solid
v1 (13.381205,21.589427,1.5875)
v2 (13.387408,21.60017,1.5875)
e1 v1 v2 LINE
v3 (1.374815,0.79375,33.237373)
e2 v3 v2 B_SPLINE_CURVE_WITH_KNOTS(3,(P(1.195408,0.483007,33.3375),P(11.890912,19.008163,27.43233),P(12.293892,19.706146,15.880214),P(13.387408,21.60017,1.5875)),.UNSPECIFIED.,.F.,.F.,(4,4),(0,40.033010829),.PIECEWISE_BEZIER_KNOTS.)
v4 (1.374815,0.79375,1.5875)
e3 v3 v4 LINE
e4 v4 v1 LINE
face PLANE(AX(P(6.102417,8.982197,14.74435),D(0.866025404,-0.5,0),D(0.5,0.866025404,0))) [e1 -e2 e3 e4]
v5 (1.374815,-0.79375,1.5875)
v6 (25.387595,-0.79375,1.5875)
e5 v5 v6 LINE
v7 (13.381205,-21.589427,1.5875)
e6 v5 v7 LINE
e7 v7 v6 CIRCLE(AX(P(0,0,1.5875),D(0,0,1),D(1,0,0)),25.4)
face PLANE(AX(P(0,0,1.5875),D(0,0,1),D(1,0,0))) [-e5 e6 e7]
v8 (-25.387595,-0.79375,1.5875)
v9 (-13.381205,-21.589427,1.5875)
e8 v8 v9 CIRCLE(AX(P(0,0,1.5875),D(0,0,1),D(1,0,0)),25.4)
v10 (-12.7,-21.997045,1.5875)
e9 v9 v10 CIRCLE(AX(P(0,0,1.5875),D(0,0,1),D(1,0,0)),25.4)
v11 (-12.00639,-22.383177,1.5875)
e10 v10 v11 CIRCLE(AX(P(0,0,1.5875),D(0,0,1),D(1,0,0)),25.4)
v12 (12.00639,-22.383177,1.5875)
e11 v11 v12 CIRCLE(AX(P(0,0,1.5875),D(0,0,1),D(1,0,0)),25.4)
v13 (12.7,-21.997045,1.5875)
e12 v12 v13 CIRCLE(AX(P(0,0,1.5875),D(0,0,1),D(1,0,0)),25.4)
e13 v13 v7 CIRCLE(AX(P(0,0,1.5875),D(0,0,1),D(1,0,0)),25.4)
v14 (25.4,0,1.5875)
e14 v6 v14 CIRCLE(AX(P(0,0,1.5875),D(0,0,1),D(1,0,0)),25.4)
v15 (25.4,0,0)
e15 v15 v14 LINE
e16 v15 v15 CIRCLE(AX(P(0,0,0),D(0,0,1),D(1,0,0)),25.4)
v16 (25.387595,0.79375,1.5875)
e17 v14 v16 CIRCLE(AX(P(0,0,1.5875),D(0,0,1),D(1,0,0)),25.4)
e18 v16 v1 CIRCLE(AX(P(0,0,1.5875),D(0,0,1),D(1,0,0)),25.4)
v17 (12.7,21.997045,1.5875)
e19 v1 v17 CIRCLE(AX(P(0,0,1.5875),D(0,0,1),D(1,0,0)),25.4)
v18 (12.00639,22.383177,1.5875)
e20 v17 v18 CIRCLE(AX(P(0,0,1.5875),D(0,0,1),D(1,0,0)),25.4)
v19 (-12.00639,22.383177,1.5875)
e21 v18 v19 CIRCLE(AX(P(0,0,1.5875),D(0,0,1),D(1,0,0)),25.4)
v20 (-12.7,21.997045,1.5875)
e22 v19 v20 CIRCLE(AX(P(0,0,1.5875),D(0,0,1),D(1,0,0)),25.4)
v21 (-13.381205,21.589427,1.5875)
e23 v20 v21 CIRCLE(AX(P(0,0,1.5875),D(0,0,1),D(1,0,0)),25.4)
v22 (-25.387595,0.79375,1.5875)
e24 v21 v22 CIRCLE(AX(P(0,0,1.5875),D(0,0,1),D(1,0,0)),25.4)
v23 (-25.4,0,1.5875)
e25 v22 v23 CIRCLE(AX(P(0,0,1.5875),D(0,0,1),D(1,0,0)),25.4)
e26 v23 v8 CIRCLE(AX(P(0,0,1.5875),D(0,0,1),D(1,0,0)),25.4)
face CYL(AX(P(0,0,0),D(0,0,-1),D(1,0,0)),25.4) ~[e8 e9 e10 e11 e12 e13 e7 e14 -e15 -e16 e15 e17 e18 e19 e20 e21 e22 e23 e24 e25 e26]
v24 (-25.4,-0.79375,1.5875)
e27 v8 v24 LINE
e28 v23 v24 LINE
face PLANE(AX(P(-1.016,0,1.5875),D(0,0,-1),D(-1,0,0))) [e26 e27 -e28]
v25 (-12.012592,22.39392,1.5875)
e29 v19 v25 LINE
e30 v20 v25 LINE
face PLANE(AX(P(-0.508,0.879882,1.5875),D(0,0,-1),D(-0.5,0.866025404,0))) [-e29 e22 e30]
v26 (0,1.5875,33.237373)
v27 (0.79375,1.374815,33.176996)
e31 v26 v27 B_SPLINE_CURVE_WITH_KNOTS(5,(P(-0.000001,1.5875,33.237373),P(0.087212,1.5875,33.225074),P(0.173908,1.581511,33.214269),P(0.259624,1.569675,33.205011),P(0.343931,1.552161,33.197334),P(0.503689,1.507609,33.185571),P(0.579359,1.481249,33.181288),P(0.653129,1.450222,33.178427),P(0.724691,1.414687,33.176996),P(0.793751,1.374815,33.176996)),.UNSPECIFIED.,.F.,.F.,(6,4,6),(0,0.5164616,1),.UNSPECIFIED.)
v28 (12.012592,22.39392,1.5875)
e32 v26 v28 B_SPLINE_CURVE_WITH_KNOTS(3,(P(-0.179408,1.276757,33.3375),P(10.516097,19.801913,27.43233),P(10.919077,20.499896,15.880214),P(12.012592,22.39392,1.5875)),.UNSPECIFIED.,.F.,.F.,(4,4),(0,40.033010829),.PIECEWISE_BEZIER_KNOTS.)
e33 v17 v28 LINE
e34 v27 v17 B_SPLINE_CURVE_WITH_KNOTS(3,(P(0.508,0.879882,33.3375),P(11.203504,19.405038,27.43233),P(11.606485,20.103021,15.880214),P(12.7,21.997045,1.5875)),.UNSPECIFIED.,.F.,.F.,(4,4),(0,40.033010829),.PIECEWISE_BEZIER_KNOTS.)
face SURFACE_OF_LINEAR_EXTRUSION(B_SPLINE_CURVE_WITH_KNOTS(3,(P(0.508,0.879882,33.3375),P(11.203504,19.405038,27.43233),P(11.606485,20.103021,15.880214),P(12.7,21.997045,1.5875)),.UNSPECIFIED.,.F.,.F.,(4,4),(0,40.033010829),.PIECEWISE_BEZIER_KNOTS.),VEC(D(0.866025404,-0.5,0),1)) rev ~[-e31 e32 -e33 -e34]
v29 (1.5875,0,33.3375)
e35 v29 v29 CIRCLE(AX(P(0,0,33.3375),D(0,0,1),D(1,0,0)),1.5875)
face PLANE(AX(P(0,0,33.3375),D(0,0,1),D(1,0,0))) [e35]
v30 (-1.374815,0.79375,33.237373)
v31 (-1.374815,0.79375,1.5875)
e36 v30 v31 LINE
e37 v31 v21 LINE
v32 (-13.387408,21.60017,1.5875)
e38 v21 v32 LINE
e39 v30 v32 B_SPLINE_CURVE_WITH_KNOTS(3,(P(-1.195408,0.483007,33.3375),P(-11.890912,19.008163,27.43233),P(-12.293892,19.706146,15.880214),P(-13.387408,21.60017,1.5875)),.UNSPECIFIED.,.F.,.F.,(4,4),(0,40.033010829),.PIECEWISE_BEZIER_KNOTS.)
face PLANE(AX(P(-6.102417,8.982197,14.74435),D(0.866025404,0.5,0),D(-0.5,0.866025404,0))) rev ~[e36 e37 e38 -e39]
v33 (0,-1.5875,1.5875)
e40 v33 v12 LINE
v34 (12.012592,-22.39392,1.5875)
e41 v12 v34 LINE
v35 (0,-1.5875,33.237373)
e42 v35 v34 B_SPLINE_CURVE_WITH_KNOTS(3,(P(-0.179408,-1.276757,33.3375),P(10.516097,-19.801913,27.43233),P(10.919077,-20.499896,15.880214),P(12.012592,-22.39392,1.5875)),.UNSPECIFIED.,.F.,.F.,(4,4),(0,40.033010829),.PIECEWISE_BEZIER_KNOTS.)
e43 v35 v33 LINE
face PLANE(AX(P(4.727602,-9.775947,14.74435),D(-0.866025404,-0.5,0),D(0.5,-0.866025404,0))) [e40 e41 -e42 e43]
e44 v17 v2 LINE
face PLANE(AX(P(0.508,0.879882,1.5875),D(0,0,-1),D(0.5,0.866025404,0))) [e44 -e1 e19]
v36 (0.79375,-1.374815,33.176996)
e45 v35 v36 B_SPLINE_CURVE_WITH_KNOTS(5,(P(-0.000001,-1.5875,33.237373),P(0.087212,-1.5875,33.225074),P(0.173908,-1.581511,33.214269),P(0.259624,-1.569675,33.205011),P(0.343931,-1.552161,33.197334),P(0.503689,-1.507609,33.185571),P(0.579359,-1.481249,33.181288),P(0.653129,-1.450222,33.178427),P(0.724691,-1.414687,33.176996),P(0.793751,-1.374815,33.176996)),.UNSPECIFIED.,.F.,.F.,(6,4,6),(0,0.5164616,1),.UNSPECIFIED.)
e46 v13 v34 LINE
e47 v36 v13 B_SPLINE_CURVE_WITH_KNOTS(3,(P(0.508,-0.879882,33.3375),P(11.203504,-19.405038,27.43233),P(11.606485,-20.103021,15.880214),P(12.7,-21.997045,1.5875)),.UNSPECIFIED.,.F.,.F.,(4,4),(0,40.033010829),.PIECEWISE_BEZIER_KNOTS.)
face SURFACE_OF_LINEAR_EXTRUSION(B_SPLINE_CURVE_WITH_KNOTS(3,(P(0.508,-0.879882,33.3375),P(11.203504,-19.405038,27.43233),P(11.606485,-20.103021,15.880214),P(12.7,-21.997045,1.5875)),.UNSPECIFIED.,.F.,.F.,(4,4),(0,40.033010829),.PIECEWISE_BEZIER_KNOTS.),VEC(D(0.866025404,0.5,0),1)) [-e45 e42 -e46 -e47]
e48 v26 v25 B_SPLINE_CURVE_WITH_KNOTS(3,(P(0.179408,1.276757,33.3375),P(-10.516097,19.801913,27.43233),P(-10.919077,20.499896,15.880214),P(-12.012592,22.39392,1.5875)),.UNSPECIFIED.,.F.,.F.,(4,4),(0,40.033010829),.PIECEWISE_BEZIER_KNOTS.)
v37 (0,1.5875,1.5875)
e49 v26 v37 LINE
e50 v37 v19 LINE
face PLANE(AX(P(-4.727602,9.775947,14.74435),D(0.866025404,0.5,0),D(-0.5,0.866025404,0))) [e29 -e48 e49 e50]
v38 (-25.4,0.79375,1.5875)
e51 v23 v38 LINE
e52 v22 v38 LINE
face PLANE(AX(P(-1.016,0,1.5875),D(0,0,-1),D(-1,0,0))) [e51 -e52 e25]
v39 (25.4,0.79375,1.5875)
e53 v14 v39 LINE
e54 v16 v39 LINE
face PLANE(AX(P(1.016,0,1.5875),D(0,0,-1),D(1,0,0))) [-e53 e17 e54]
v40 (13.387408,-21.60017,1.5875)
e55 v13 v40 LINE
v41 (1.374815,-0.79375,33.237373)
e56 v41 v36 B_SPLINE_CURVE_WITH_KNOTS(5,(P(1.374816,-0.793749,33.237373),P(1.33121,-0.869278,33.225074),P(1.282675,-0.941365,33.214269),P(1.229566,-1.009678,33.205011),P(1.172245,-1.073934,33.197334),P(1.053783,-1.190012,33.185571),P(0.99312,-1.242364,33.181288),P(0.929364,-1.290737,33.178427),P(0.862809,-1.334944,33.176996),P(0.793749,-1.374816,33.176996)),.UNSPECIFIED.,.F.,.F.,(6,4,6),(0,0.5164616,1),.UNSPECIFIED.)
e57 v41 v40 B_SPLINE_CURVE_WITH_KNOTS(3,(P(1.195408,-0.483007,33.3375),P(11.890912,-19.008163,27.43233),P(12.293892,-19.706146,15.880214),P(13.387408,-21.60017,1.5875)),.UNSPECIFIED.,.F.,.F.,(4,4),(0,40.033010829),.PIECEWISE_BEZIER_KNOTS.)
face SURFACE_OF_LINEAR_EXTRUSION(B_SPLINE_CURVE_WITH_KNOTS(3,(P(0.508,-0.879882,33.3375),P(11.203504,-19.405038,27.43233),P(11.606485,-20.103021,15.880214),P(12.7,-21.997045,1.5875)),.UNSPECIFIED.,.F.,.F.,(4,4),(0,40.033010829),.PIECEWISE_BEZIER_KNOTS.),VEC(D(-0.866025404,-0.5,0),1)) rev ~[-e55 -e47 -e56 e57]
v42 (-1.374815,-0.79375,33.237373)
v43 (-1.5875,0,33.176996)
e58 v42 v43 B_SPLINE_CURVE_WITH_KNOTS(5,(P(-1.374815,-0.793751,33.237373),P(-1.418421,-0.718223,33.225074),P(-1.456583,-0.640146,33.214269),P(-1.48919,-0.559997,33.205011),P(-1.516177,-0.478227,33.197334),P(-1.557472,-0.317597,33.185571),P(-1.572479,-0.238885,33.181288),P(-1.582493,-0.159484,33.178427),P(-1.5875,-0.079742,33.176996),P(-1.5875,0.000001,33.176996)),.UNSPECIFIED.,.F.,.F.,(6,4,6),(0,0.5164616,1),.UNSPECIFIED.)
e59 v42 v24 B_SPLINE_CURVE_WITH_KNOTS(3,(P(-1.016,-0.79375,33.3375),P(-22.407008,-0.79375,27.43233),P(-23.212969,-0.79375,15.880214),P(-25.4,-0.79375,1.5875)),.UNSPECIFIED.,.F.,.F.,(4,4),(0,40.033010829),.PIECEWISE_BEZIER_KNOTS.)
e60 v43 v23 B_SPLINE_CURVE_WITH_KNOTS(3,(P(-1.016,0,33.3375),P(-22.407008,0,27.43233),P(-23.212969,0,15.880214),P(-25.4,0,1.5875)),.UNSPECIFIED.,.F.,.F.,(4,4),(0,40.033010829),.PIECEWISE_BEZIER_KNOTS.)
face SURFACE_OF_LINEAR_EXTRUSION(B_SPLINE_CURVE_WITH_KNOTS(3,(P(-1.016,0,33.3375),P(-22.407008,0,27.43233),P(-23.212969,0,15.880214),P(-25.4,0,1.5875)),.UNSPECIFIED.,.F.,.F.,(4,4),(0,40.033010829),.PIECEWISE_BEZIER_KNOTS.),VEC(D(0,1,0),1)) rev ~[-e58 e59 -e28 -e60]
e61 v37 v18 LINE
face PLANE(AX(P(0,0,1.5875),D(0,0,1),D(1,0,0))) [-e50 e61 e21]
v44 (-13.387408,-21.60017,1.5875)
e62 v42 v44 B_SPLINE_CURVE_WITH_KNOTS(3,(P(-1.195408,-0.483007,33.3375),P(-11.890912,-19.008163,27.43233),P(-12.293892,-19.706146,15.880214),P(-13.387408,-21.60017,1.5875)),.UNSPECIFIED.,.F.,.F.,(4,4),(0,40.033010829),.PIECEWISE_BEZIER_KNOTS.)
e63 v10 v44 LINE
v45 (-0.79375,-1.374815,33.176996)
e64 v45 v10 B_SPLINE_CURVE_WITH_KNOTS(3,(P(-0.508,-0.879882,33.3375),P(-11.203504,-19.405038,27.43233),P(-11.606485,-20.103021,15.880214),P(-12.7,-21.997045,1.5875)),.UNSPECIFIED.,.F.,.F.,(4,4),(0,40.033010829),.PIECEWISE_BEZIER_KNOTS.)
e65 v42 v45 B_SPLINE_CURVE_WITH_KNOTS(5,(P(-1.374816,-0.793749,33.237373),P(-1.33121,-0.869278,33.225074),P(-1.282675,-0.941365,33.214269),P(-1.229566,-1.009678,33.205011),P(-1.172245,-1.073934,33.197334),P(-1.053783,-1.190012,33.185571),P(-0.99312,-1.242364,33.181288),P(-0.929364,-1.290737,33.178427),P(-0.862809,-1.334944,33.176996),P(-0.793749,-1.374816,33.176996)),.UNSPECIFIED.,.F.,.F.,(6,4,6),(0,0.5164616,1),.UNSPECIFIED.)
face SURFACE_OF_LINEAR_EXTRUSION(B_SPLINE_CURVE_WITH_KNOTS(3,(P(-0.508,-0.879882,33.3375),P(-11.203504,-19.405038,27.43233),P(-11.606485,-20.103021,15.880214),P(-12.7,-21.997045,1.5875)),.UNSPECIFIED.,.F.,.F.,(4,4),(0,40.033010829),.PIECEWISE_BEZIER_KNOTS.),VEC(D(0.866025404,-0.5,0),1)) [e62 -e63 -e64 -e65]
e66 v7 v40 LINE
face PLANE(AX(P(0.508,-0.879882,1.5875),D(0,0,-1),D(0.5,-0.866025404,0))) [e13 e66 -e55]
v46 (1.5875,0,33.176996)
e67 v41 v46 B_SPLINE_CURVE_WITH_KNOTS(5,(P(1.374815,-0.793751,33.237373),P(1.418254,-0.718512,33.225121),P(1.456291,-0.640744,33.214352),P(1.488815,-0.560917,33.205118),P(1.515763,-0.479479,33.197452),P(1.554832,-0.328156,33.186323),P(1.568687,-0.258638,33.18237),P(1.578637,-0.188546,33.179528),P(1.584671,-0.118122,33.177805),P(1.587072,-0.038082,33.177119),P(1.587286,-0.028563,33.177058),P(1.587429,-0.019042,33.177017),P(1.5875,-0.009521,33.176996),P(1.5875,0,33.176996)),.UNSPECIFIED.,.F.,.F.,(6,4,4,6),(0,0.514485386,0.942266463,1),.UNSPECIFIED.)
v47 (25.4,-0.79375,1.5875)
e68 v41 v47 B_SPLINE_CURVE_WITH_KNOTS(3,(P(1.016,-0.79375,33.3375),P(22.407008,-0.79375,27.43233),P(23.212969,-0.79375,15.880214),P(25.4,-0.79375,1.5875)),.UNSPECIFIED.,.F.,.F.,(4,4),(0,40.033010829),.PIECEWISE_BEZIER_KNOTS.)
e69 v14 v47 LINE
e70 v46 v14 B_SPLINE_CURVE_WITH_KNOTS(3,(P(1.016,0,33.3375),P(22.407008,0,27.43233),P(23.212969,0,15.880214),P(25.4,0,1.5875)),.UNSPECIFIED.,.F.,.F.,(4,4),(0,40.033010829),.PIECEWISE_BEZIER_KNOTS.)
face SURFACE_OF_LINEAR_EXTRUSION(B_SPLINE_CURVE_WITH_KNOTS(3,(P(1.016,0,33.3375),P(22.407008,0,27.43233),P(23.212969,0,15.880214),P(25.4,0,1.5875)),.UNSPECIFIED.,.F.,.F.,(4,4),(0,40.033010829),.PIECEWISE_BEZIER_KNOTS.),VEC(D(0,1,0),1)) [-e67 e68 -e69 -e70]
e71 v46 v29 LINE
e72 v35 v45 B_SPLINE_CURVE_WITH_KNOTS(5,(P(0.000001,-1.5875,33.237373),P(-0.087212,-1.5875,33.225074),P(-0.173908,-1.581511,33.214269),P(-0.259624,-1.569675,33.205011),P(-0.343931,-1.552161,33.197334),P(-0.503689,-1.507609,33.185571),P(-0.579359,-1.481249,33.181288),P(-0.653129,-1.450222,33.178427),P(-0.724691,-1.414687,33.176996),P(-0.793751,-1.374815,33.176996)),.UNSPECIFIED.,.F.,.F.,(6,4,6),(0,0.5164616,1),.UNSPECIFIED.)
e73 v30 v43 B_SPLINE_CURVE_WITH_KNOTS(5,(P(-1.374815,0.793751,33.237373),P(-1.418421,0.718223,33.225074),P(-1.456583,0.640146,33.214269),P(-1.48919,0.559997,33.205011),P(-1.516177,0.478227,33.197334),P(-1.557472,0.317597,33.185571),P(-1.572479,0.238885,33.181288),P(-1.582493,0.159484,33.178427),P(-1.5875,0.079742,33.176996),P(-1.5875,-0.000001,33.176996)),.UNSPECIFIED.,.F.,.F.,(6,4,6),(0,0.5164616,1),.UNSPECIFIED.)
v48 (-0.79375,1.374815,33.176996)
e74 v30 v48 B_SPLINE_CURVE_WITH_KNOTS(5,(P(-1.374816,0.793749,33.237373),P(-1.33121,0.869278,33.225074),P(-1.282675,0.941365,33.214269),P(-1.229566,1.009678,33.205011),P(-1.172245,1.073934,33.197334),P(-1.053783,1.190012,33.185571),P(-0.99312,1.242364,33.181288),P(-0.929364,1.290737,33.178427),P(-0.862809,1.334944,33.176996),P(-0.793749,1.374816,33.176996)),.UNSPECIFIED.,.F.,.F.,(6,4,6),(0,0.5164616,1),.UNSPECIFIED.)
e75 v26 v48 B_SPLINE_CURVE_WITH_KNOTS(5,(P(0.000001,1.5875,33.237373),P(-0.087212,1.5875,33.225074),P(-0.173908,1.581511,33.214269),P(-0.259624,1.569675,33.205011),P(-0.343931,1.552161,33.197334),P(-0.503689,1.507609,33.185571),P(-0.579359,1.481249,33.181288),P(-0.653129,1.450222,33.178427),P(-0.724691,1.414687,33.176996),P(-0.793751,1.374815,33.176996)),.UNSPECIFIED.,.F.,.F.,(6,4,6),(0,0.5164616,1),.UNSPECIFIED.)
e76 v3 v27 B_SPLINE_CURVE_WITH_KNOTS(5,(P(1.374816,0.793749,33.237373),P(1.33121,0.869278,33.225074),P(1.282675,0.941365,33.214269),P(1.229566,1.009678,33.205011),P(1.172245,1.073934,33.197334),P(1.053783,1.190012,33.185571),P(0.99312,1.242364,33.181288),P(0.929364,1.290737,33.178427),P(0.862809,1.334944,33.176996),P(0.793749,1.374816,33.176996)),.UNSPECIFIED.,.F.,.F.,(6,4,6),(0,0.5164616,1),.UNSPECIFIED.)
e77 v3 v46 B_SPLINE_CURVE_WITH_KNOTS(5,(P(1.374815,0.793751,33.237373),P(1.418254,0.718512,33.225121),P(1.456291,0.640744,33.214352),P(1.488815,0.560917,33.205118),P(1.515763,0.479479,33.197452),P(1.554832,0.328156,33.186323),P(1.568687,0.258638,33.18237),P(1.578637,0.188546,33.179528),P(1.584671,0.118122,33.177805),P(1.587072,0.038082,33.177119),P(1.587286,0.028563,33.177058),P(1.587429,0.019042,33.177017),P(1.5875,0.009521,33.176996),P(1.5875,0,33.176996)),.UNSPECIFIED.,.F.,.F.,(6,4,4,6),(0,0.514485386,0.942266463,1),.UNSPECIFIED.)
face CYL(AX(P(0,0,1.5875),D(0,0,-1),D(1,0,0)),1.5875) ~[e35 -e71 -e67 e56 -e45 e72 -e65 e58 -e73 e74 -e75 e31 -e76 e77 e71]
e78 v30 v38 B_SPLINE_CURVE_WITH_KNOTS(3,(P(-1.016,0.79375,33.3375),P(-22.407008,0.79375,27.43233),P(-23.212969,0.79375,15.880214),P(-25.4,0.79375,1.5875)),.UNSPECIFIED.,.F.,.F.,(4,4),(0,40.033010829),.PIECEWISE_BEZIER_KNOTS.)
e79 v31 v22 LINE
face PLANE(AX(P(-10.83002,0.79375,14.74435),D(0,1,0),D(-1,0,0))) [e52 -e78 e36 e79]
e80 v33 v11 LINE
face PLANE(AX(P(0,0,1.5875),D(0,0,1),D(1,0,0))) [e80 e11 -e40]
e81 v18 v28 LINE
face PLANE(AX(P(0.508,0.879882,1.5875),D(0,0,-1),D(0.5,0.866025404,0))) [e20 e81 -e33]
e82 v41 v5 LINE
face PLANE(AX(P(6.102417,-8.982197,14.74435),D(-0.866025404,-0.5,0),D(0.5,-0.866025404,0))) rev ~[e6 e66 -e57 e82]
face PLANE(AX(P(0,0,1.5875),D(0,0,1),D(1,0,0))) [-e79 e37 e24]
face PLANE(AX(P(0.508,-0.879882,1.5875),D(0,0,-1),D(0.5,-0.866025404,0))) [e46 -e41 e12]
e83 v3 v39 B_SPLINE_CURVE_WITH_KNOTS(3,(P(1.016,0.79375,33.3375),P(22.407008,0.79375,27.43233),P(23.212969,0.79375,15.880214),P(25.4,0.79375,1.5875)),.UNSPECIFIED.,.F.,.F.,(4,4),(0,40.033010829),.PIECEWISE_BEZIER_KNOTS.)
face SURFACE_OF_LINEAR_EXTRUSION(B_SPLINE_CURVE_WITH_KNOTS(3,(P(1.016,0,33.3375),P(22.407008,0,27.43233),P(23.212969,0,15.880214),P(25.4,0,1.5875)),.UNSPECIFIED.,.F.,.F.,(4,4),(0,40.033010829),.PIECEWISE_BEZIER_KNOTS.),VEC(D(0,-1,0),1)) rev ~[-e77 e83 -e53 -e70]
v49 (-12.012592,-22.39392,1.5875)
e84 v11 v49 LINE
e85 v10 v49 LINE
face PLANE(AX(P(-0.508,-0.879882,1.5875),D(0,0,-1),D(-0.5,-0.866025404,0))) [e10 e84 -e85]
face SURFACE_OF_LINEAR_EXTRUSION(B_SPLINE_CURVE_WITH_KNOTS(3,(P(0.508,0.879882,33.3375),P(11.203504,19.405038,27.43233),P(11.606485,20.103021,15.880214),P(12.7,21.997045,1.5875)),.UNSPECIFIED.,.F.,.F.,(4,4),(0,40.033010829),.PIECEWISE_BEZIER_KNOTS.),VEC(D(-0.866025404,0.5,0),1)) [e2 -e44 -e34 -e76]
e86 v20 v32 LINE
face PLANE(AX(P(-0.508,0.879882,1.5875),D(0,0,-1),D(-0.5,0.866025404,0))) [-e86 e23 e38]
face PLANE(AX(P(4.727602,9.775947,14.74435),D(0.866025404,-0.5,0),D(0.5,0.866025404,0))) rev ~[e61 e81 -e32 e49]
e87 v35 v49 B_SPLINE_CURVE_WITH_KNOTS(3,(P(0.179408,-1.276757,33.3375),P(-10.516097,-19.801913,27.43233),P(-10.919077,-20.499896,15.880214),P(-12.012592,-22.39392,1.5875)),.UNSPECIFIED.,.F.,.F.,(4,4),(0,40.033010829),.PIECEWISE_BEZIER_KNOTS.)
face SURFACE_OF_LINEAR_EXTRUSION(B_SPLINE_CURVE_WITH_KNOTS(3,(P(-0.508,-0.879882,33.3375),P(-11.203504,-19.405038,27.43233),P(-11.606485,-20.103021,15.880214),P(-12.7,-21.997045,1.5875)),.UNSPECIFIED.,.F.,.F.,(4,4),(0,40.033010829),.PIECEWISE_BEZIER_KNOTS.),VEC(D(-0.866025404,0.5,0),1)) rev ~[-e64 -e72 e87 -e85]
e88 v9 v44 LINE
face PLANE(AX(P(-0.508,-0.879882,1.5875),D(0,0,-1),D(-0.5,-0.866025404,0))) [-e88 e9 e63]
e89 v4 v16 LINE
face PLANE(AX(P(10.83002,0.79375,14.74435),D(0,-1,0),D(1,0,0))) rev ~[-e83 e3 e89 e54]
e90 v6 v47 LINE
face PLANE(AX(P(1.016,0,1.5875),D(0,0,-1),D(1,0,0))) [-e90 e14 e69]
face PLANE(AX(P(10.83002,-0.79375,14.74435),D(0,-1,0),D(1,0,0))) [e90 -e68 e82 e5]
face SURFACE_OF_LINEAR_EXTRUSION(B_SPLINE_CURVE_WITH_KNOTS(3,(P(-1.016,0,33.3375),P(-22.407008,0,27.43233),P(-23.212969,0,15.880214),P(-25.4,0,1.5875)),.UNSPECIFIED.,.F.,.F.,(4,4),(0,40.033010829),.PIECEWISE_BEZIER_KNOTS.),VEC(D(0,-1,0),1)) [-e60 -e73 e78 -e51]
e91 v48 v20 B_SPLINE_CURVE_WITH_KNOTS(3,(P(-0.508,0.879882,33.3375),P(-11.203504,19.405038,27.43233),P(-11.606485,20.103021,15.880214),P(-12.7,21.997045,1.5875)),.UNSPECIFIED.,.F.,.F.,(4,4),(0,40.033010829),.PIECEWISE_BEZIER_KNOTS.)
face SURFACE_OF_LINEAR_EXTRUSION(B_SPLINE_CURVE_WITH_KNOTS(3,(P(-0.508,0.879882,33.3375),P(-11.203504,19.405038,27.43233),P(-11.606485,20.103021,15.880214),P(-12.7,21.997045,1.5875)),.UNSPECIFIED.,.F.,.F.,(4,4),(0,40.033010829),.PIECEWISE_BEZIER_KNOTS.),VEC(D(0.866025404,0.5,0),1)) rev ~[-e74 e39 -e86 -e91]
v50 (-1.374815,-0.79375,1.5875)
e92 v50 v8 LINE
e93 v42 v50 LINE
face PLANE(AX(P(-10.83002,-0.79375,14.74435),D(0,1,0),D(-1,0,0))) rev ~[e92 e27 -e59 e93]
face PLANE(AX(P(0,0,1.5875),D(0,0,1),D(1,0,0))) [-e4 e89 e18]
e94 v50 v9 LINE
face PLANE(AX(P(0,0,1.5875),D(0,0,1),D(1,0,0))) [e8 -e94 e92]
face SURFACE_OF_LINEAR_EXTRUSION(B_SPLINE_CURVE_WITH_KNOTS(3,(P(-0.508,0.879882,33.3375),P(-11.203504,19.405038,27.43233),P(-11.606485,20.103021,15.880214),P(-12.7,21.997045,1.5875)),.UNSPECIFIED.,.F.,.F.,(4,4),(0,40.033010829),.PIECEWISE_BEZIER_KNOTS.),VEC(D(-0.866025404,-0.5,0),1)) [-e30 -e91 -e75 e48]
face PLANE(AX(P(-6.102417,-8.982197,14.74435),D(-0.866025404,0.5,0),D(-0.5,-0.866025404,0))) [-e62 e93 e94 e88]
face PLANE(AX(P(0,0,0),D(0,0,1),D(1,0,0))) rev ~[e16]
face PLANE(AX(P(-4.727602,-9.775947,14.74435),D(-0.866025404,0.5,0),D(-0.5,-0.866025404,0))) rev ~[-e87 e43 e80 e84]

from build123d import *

# Parameters (mm, degrees)
F0_R            = 25.4
F1_DEPTH        = 1.5875
F2_R            = 1.5875
F3_DEPTH        = 31.75
F5_DEPTH        = 0.79375
F5_COPIES_COUNT = 6


# Not quite as in the source:
# - a pattern or mirror of a feature is missing from the dataset's text; its kind, count and spacing are read off the source's solid


with BuildPart() as f1:
    # F0 (on Top) → F1 (new body)
    with BuildSketch(Plane.XY):
        Circle(F0_R)
    extrude(amount=F1_DEPTH)

    # F2 (on face) → F3 (join)
    with BuildSketch(Plane.XY.offset(1.5875)):
        Circle(F2_R)
    extrude(amount=F3_DEPTH)

    # F4 (on Front) → F5 (join, symmetric)
    with BuildSketch(Plane.XZ):
        with BuildLine():
            Line((1.016, 33.3375), (1.016, 1.5875))
            Line((1.016, 1.5875), (25.4, 1.5875))
            add(Edge.make_bspline(
                [(1.016, 33.3375), (22.407008335, 27.4323299527), (23.2129693031, 15.8802140504), (25.4, 1.5875)],
                knots=[0, 0, 0, 0, 40.0330108286, 40.0330108286, 40.0330108286, 40.0330108286], degree=3))
        make_face()
    f5 = extrude(amount=F5_DEPTH, both=True)

    # F5_copies: F5 ×6 about axis
    f5_copies_axis = Axis((0, 0, 0), (0, 0, 1))
    for i in range(1, F5_COPIES_COUNT):
        add(f5.rotate(f5_copies_axis, i * 360 / F5_COPIES_COUNT))


solid = f1.part
